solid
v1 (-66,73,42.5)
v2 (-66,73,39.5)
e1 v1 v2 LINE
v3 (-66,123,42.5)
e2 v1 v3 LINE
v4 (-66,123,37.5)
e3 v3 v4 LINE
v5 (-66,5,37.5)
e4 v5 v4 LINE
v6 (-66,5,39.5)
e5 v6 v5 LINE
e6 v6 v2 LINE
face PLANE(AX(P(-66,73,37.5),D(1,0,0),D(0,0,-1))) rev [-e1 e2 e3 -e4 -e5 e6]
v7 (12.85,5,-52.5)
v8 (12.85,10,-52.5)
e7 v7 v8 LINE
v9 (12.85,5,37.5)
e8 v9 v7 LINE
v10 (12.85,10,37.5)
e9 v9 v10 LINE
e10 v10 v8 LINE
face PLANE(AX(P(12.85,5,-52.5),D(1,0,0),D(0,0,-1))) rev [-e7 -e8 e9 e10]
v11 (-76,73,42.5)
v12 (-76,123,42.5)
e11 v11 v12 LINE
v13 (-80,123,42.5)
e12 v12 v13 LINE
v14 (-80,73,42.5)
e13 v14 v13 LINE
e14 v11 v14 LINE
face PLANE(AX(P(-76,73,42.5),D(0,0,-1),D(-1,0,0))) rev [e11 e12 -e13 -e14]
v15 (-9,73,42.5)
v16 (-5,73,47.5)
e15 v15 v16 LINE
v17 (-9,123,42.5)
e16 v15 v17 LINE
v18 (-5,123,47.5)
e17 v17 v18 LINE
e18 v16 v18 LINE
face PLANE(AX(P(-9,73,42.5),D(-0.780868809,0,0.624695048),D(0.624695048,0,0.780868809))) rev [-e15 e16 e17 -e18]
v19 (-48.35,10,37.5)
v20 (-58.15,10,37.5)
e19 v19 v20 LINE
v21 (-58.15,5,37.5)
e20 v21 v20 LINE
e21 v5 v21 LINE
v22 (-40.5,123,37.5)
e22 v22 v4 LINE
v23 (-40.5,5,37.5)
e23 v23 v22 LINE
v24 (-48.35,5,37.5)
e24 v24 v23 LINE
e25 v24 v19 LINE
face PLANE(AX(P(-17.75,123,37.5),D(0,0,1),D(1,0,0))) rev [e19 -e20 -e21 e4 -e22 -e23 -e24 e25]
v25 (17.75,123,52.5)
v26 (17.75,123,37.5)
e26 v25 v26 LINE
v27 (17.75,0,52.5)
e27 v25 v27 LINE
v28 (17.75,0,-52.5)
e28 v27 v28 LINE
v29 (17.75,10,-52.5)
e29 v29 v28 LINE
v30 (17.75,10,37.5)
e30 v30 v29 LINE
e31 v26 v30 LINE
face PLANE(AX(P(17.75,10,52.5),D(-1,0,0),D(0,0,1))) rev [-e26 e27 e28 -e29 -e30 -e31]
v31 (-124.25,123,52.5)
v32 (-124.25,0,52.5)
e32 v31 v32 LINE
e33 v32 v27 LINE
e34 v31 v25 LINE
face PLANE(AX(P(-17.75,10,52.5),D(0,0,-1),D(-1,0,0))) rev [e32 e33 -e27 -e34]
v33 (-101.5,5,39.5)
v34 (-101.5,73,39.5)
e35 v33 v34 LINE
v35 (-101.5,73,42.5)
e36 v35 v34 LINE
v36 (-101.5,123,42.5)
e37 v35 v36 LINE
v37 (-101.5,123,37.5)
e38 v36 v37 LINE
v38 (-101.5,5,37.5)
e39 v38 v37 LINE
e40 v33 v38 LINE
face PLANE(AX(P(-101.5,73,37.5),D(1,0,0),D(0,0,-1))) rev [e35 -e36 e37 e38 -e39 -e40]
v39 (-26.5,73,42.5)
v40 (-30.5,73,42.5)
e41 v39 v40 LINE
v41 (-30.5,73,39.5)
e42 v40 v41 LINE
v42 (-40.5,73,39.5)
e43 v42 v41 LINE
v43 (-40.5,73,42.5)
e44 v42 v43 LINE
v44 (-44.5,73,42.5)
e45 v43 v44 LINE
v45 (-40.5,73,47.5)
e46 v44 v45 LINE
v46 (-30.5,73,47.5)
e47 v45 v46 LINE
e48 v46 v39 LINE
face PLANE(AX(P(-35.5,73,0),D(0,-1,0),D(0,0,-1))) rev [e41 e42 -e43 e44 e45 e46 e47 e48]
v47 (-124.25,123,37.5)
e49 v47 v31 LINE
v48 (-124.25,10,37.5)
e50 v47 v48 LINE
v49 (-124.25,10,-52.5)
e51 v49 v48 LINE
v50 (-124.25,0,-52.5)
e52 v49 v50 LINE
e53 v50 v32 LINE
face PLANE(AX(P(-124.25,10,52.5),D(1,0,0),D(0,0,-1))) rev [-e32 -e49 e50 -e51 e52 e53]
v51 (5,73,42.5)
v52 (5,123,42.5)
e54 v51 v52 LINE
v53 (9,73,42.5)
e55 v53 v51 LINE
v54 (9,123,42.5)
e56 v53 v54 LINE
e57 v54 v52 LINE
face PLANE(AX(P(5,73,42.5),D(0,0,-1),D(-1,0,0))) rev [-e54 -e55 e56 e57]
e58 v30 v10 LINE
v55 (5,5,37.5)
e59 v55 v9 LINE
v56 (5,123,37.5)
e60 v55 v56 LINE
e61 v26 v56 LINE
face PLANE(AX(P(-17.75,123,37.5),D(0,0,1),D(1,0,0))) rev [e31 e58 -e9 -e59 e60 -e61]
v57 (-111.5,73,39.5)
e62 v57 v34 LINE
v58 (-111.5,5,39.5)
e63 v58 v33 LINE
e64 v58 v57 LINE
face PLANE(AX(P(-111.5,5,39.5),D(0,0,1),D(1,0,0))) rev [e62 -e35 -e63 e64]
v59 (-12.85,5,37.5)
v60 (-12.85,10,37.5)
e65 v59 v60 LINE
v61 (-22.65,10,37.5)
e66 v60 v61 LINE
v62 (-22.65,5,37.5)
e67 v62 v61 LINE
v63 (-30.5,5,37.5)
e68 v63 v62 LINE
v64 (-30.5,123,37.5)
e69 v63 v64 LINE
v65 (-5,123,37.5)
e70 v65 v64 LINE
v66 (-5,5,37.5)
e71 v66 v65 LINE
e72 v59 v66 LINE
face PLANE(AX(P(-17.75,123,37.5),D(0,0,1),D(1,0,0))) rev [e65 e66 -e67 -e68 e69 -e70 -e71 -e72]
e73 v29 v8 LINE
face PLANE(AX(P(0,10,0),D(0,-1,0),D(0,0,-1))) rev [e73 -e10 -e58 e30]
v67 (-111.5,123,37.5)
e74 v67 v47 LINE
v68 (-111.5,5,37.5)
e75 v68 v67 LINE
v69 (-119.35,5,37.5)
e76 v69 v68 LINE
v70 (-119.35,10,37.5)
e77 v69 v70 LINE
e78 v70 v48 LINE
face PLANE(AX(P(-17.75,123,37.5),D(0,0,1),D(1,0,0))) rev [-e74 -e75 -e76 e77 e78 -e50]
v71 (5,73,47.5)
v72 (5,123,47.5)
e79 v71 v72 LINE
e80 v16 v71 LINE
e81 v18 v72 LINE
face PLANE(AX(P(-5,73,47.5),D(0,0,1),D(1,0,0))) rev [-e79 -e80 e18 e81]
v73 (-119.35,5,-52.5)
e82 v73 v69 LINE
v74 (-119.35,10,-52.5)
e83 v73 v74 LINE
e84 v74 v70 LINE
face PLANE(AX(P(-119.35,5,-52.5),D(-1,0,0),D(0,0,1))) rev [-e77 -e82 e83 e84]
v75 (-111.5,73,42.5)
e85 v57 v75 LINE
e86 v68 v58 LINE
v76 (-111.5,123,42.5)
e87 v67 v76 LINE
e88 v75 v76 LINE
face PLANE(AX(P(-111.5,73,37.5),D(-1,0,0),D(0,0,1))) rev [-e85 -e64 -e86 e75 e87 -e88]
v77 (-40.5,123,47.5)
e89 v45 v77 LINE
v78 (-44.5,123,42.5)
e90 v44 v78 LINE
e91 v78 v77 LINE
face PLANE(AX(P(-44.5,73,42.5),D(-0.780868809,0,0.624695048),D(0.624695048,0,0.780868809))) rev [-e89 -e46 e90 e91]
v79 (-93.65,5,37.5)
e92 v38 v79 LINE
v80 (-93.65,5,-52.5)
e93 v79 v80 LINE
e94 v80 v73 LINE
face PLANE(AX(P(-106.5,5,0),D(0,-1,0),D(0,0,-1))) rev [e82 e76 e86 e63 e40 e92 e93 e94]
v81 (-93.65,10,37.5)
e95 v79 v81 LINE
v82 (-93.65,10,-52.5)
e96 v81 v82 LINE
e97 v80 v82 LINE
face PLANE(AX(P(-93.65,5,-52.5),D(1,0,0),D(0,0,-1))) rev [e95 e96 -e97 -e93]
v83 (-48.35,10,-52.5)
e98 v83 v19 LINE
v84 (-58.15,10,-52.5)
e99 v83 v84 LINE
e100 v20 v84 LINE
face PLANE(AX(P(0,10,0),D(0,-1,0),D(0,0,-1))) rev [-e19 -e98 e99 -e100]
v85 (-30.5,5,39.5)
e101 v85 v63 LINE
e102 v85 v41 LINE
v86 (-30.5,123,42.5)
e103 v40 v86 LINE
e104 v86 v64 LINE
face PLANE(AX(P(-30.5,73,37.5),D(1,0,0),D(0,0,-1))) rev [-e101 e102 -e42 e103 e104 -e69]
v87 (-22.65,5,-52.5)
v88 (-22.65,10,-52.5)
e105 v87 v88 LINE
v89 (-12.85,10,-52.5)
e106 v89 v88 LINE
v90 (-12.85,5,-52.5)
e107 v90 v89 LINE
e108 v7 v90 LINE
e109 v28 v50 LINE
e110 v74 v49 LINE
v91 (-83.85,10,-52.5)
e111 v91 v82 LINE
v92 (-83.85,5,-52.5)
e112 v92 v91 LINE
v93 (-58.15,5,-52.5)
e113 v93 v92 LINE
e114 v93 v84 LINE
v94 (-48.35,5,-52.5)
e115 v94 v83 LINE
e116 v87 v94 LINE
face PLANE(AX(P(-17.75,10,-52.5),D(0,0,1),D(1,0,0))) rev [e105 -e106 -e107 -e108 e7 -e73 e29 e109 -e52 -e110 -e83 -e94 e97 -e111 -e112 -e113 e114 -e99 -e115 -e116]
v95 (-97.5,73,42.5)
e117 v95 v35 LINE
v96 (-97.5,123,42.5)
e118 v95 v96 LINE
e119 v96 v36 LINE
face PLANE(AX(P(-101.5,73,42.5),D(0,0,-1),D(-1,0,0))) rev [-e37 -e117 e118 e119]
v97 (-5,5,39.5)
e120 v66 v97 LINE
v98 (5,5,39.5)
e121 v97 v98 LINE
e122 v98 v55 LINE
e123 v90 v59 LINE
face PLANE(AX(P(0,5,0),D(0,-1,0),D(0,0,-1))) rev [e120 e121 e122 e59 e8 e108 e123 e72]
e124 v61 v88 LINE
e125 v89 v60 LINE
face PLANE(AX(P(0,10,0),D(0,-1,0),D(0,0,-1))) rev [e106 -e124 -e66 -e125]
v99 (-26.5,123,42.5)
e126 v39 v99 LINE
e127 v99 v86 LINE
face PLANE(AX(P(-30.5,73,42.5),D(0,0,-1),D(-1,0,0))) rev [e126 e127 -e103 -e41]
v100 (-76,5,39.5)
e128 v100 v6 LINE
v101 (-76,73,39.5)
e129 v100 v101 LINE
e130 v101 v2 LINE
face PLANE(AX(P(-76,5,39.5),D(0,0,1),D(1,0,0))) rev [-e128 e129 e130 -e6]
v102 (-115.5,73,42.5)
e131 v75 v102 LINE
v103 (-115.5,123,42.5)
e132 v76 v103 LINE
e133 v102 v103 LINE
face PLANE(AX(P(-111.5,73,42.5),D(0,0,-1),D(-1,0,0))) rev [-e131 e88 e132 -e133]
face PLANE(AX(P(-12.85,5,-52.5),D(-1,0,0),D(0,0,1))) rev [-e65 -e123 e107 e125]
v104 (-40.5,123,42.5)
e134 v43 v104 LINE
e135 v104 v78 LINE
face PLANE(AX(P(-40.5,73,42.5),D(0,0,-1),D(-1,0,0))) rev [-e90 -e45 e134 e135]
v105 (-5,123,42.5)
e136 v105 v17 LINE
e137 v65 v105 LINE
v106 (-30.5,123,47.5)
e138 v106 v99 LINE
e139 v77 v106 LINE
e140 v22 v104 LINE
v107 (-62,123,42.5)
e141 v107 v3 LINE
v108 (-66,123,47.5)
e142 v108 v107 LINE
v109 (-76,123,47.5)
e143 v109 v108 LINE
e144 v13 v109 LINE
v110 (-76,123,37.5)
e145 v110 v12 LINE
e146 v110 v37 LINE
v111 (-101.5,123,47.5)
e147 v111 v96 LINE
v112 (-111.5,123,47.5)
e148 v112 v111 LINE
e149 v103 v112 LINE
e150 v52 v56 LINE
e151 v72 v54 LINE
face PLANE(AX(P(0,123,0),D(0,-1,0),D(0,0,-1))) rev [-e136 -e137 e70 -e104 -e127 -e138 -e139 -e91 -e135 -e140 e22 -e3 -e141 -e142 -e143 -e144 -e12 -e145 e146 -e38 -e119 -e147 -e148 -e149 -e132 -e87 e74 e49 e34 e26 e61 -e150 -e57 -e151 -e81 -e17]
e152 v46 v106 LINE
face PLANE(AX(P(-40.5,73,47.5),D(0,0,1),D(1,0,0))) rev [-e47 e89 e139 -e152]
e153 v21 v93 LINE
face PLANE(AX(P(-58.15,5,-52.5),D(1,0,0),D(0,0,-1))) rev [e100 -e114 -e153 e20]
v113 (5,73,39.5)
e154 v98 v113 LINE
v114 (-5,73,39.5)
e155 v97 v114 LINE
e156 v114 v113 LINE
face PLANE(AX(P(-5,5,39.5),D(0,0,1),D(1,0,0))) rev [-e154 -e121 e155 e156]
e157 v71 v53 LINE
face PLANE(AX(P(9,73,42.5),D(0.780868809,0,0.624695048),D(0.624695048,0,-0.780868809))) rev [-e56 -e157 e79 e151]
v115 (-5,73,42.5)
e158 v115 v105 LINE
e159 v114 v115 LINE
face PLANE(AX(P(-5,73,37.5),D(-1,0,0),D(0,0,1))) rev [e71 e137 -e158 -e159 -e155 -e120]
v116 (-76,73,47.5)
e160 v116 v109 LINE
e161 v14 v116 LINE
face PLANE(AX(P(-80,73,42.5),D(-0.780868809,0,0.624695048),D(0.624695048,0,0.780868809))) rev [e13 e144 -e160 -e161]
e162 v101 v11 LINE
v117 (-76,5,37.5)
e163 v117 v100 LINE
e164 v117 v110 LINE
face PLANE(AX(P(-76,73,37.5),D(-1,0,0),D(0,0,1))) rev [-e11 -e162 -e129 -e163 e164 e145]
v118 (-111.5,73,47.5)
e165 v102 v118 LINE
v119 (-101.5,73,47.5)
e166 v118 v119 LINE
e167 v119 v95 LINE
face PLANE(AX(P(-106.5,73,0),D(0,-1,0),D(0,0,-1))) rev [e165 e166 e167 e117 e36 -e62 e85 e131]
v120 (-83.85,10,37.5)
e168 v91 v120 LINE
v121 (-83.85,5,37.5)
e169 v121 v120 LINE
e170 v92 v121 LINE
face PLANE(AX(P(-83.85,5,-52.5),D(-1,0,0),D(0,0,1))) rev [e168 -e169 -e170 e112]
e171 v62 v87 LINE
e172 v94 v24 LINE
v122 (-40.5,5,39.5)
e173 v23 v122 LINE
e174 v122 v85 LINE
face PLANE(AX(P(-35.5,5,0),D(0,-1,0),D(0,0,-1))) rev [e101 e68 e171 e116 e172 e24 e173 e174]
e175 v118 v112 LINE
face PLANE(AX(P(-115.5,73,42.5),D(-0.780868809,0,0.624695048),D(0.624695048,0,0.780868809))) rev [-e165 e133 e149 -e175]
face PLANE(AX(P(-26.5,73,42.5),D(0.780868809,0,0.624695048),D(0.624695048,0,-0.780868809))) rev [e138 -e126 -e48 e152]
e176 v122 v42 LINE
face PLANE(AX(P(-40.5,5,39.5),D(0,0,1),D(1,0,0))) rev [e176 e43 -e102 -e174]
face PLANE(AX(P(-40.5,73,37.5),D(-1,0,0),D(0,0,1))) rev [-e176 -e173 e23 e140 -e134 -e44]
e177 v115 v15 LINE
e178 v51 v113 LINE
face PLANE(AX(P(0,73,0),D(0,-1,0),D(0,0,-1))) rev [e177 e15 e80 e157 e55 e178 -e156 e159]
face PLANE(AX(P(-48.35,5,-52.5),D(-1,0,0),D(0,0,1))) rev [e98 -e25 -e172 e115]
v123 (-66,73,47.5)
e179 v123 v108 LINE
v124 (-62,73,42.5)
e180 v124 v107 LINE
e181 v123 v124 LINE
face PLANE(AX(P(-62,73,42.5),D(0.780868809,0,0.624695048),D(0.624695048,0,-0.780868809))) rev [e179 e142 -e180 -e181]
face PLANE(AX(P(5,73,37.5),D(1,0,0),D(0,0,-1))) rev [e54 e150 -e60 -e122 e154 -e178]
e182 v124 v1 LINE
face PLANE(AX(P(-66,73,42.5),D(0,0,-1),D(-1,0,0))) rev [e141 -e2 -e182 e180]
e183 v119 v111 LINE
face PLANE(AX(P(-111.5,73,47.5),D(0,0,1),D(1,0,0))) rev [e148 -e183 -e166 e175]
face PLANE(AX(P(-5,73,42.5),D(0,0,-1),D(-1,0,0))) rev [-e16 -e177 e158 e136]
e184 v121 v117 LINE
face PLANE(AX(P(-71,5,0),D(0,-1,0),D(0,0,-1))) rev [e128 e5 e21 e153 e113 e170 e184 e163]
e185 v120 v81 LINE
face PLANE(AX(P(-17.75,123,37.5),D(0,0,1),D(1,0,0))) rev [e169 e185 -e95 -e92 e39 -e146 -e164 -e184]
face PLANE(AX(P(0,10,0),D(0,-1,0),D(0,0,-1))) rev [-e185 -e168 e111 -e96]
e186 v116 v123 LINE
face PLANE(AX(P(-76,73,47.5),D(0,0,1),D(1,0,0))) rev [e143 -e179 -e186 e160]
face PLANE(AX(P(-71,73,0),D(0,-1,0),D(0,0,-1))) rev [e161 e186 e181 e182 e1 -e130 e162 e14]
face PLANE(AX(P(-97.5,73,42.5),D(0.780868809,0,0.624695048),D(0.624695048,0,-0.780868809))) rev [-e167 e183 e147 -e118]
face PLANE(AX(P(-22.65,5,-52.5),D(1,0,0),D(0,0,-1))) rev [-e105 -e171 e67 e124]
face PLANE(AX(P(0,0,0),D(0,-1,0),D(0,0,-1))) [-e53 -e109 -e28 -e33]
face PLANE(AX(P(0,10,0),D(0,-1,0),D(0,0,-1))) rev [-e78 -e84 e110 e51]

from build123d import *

# Parameters (mm, degrees)
SKETCH1_W           = 35.5
SKETCH1_H           = 105
BOSS_EXTRUDE1_DEPTH = 10
SKETCH2_W           = 35.5
SKETCH2_H           = 15
BOSS_EXTRUDE2_DEPTH = 113
SKETCH5_W           = 25.7
SKETCH5_H           = 90
CUT_EXTRUDE2_DEPTH  = 5
CUT_EXTRUDE3_DEPTH  = 50
SKETCH7_W           = 10
SKETCH7_H           = 2
CUT_EXTRUDE4_DEPTH  = 68
LPATTERN1_COUNT     = 4
LPATTERN1_PITCH     = 35.5


with BuildPart() as part:
    # Sketch1 → Boss-Extrude1 (new body)
    with BuildSketch(Plane(origin=(0, 0, 0), x_dir=(1, 0, 0), z_dir=(0, 1, 0))):
        Rectangle(SKETCH1_W, SKETCH1_H)
    boss_extrude1 = extrude(amount=BOSS_EXTRUDE1_DEPTH)

    # Sketch2 → Boss-Extrude2 (add)
    with BuildSketch(Plane(origin=(0, 10, 0), x_dir=(1, 0, 0), z_dir=(0, 1, 0))):
        with Locations((0, -45)):
            Rectangle(SKETCH2_W, SKETCH2_H)
    boss_extrude2 = extrude(amount=BOSS_EXTRUDE2_DEPTH)

    # Sketch5 → Cut-Extrude2 (cut)
    with BuildSketch(Plane(origin=(0, 10, 0), x_dir=(1, 0, 0), z_dir=(0, 1, 0))):
        with Locations((0, 7.5)):
            Rectangle(SKETCH5_W, SKETCH5_H)
    cut_extrude2 = extrude(amount=-CUT_EXTRUDE2_DEPTH, mode=Mode.SUBTRACT)

    # Sketch6 → Cut-Extrude3 (cut)
    with BuildSketch(Plane(origin=(0, 123, 0), x_dir=(1, 0, 0), z_dir=(0, 1, 0))):
        Polygon((-5, -37.5), (5, -37.5), (5, -42.5), (9, -42.5), (5, -47.5), (-5, -47.5), (-9, -42.5), (-5, -42.5), align=None)
    cut_extrude3 = extrude(amount=-CUT_EXTRUDE3_DEPTH, mode=Mode.SUBTRACT)

    # Sketch7 → Cut-Extrude4 (cut)
    with BuildSketch(Plane(origin=(0, 73, 0), x_dir=(1, 0, 0), z_dir=(0, 1, 0))):
        with Locations((0, -38.5)):
            Rectangle(SKETCH7_W, SKETCH7_H)
    cut_extrude4 = extrude(amount=-CUT_EXTRUDE4_DEPTH, mode=Mode.SUBTRACT)

    # LPattern1: Boss-Extrude1, Boss-Extrude2, Cut-Extrude2, Cut-Extrude3, Cut-Extrude4 ×4
    with Locations(*[(-i * LPATTERN1_PITCH, 0, 0) for i in range(1, LPATTERN1_COUNT)]):
        add(boss_extrude1)
        add(boss_extrude2)
        add(cut_extrude2, mode=Mode.SUBTRACT)
        add(cut_extrude3, mode=Mode.SUBTRACT)
        add(cut_extrude4, mode=Mode.SUBTRACT)


solid = part.part
